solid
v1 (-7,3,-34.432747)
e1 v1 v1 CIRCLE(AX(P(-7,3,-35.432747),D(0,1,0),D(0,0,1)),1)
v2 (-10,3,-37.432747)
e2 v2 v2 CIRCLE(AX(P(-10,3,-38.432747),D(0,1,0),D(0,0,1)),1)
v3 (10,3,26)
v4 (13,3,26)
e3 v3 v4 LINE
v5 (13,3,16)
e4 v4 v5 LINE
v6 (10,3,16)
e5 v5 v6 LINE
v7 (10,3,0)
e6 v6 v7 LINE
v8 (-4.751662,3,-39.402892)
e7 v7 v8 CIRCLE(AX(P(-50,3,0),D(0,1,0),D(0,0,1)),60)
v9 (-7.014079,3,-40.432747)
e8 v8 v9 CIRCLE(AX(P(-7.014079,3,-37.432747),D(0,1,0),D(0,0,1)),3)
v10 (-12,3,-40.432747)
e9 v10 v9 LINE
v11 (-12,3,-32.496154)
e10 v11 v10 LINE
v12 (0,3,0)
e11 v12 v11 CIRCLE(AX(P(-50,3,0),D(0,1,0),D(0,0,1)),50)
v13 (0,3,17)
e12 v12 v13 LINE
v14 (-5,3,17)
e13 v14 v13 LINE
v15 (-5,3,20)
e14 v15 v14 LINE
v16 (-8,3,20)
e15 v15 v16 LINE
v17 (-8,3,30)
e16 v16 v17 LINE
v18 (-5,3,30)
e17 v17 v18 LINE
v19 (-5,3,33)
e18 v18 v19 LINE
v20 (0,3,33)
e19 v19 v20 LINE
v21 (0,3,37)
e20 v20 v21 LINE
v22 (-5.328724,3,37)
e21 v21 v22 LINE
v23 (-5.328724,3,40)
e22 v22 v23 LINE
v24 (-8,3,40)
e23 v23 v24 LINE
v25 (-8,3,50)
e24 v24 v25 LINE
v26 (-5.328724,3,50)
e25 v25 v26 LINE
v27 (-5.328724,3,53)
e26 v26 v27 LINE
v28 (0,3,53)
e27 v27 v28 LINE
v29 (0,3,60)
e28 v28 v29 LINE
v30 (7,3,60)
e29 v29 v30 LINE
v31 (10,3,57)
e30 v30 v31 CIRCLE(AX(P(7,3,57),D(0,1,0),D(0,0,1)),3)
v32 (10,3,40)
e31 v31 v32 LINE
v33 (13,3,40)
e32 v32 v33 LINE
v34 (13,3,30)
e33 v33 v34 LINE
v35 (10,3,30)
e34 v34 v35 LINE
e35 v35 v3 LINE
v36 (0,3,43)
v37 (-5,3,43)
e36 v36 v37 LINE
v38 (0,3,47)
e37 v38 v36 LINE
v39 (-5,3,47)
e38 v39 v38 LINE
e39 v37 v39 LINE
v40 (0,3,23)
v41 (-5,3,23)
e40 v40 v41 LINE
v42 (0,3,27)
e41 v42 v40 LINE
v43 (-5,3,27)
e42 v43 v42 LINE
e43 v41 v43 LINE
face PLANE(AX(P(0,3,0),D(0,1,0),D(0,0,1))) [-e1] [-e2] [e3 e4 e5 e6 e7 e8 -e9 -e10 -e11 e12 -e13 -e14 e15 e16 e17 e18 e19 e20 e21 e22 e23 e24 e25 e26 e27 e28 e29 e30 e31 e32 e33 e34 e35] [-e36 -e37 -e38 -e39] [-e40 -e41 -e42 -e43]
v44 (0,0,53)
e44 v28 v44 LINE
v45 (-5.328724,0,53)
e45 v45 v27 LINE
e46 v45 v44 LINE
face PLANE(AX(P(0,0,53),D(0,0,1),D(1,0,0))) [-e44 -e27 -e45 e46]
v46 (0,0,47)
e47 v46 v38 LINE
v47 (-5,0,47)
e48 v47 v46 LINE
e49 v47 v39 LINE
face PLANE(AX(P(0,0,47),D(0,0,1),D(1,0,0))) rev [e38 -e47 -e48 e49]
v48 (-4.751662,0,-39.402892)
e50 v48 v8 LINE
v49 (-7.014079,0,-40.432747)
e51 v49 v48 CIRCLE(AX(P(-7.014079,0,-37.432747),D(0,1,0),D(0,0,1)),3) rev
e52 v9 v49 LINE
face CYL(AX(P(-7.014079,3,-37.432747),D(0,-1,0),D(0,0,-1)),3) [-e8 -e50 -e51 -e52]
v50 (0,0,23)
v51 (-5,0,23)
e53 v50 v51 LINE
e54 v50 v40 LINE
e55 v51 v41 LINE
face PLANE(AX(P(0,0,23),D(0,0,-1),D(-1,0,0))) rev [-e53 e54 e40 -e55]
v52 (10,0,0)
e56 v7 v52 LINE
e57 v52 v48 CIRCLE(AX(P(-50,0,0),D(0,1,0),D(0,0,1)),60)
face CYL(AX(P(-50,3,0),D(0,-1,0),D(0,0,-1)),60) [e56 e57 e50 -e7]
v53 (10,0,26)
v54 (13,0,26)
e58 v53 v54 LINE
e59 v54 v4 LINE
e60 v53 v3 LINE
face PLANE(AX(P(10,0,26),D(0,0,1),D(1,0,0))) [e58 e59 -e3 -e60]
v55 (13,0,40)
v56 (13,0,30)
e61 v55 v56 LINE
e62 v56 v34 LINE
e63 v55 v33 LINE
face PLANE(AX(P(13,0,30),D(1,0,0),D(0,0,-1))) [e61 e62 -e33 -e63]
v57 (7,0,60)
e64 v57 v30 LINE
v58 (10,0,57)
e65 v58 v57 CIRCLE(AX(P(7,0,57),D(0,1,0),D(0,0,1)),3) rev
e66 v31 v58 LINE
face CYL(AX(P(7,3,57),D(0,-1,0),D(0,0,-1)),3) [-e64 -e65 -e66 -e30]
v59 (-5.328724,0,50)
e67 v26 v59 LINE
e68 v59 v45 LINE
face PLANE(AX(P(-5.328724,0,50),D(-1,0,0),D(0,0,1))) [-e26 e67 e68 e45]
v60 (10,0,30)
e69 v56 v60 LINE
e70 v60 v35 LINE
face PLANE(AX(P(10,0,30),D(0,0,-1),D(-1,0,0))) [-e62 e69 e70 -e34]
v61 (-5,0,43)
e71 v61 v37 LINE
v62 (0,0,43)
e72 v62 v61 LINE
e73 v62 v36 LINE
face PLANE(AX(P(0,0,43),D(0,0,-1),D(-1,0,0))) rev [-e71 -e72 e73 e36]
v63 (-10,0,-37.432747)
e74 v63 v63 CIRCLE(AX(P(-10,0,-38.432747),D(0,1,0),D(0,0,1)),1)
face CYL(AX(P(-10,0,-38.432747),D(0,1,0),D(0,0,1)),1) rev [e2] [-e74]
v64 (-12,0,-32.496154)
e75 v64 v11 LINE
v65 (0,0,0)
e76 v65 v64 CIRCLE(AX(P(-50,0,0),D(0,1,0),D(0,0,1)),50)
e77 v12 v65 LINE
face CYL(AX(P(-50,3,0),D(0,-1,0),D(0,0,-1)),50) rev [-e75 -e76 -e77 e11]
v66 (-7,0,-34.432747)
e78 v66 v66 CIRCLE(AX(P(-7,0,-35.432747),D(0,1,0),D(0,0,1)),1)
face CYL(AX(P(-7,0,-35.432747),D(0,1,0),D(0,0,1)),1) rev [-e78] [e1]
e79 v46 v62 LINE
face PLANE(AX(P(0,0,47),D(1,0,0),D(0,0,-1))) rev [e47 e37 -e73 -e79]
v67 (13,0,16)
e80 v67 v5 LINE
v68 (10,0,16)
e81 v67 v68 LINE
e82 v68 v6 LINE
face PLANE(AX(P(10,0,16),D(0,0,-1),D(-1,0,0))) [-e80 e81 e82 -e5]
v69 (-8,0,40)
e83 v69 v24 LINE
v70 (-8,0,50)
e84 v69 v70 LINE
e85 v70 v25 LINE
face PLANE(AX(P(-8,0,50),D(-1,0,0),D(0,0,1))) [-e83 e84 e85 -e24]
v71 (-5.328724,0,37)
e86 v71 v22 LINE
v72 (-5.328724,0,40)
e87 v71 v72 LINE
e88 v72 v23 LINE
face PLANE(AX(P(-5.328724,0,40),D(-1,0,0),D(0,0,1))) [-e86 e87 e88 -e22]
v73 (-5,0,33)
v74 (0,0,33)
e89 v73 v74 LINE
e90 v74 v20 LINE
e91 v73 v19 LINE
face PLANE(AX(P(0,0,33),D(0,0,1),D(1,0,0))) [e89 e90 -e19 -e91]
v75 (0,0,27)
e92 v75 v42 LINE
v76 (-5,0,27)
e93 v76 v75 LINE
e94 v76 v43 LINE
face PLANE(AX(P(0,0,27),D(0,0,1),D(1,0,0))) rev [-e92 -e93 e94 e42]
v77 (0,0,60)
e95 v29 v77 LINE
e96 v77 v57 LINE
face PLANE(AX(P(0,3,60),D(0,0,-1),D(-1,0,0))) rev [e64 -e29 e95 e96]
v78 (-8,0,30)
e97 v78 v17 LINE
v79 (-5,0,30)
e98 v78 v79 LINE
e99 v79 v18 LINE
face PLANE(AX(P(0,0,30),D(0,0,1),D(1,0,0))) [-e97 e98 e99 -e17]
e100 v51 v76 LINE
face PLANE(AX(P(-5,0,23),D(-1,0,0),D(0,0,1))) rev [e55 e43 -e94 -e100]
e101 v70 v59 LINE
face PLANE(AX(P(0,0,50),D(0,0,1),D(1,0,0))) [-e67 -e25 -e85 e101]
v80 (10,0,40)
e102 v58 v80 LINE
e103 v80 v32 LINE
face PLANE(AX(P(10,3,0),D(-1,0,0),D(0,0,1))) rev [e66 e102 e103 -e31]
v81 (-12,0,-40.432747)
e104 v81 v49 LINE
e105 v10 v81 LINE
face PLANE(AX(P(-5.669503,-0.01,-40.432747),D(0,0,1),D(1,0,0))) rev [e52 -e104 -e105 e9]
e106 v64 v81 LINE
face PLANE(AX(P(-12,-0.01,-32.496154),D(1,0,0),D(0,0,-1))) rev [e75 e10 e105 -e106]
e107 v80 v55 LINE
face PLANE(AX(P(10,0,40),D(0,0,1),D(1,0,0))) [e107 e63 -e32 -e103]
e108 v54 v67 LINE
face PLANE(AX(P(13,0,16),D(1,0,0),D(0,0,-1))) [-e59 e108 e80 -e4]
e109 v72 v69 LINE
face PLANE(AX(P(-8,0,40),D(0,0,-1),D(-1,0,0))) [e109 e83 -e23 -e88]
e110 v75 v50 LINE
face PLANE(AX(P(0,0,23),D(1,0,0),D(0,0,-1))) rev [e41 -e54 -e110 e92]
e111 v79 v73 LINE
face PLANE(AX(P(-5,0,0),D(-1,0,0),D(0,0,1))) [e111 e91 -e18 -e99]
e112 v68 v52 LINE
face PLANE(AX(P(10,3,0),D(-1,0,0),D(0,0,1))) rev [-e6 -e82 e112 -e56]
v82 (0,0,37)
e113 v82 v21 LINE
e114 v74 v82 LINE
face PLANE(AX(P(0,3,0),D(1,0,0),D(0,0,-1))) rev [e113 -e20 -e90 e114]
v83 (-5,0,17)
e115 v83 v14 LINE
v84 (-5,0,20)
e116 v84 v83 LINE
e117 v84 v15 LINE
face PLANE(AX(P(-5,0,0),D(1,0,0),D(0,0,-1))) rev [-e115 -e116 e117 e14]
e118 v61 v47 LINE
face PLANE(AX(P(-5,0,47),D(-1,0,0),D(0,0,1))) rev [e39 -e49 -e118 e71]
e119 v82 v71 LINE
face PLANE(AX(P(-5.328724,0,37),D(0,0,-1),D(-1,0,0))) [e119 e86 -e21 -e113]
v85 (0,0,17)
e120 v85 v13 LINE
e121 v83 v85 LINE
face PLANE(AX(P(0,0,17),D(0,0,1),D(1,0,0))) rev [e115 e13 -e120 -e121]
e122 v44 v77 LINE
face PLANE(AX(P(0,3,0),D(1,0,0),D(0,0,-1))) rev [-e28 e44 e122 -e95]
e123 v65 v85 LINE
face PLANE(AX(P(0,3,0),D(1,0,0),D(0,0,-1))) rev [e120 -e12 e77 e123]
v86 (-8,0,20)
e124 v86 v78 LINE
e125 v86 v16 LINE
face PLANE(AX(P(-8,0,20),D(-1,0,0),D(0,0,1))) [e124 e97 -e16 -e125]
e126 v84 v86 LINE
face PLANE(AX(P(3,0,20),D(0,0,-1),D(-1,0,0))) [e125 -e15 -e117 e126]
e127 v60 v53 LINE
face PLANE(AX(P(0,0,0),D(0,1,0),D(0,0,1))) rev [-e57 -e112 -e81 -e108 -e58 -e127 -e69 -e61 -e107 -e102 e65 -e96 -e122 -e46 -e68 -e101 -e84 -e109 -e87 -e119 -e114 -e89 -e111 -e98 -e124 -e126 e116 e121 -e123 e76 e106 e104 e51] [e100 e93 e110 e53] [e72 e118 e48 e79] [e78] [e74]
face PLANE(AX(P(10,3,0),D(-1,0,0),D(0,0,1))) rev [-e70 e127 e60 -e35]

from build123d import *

# Parameters (mm, degrees)
SKETCH1_R              = 50
BOSS_EXTRUDE1_DEPTH    = 3
SPLIT1_SURFACE_1_BACK  = 170.732
SPLIT1_SURFACE_1_DEPTH = 341.464
SPLIT1_SURFACE_2_BACK  = 170.732
SPLIT1_SURFACE_2_DEPTH = 341.464
BODY_DELETE1_DEPTH     = 3
FILLET1_R              = 3
BOSS_EXTRUDE4_DEPTH    = 3
SPLIT2_SURFACE_3_BACK  = 109.724
SPLIT2_SURFACE_3_DEPTH = 219.448
SPLIT2_SURFACE_4_BACK  = 109.724
SPLIT2_SURFACE_4_DEPTH = 219.448
FILLET2_R              = 3
SKETCH5_R              = 1
CUT_EXTRUDE1_DEPTH     = 3
SKETCH6_W              = 3
SKETCH6_H              = 10
BOSS_EXTRUDE5_DEPTH    = 3
BOSS_EXTRUDE6_DEPTH    = 3
SKETCH8_W              = 5
SKETCH8_H              = 3
BOSS_EXTRUDE7_DEPTH    = 3
SKETCH9_W              = 5
SKETCH9_H              = 4
CUT_EXTRUDE2_DEPTH     = 3


# Read off the part's stored shape, not the designer's step: Body-Delete1
with BuildPart() as part:
    # Sketch1 → Boss-Extrude1 (new body)
    with BuildSketch(Plane(origin=(0, 0, 0), x_dir=(1, 0, 0), z_dir=(0, 1, 0))):
        with BuildLine():
            ThreePointArc((10, 0), (-107.445626465, 17.320508076), (0, -33.166247904))
            Line((0, -33.166247904), (0, -60))
            Line((0, -60), (10, -60))
            Line((10, -60), (10, 0))
        make_face()
        with Locations(Location((-50, 0, 0), (0, 0, 270))):
            Circle(SKETCH1_R, mode=Mode.SUBTRACT)
    extrude(amount=BOSS_EXTRUDE1_DEPTH)


with BuildPart() as body_2:
    # Split1: the piece behind the surface
    add(part.part)
    # Split1 surface: a surface, the sketch's curves swept straight by 341.464 mm
    with BuildLine(Plane(origin=(0, 3, 0), x_dir=(1, 0, 0), z_dir=(0, 1, 0)).offset(-SPLIT1_SURFACE_1_BACK), mode=Mode.PRIVATE) as split1_surface_1_path:
        Line((0, -33.166247904), (0, 0))
        Line((0, 0), (-12, 0))
        Line((-12, 0), (-12, 32.496153619))
        Line((-12, 32.496153619), (-12, 67.159700612))
        Line((-12, 67.159700612), (-127.638562935, 67.159700612))
        Line((-127.638562935, 67.159700612), (-127.638562935, -72.196904976))
        Line((-127.638562935, -72.196904976), (0, -72.196904976))
        Line((0, -72.196904976), (0, -33.166247904))
    split1_surface_1 = Shell.extrude(split1_surface_1_path.wire(), (0 * SPLIT1_SURFACE_1_DEPTH, 1 * SPLIT1_SURFACE_1_DEPTH, 0 * SPLIT1_SURFACE_1_DEPTH))
    split(bisect_by=split1_surface_1, keep=Keep.BOTTOM)

    # Fillet1
    fillet1_edges = [body_2.edges().sort_by_distance(p)[0] for p in [
        (10, 1.5, 60),
    ]]
    fillet(fillet1_edges, radius=FILLET1_R)

    # Sketch3 → Boss-Extrude4 (add)
    with BuildSketch(Plane(origin=(0, 3, 0), x_dir=(1, 0, 0), z_dir=(0, 1, 0))):
        Polygon((0, -50), (-8, -50), (-8, -40), (0, -40), (3, -40), (3, -50), align=None)
        Polygon((-8, -20), (-8, -30), (0, -30), (3, -30), (3, -20), (0, -20), align=None)
    extrude(amount=-BOSS_EXTRUDE4_DEPTH)


with BuildPart() as part_1:
    add(part.part)

    # Split1: split by a surface, the side it looks to stays
    # Split1 surface: a surface, the sketch's curves swept straight by 341.464 mm
    with BuildLine(Plane(origin=(0, 3, 0), x_dir=(1, 0, 0), z_dir=(0, 1, 0)).offset(-SPLIT1_SURFACE_2_BACK), mode=Mode.PRIVATE) as split1_surface_2_path:
        Line((0, -33.166247904), (0, 0))
        Line((0, 0), (-12, 0))
        Line((-12, 0), (-12, 32.496153619))
        Line((-12, 32.496153619), (-12, 67.159700612))
        Line((-12, 67.159700612), (-127.638562935, 67.159700612))
        Line((-127.638562935, 67.159700612), (-127.638562935, -72.196904976))
        Line((-127.638562935, -72.196904976), (0, -72.196904976))
        Line((0, -72.196904976), (0, -33.166247904))
    split1_surface_2 = Shell.extrude(split1_surface_2_path.wire(), (0 * SPLIT1_SURFACE_2_DEPTH, 1 * SPLIT1_SURFACE_2_DEPTH, 0 * SPLIT1_SURFACE_2_DEPTH))
    split(bisect_by=split1_surface_2, keep=Keep.TOP)

    # Body-Delete1 outline → Body-Delete1 (cut)
    with BuildSketch(Plane(origin=(0, 0, 0), x_dir=(1, 0, 0), z_dir=(0, 1, 0))):
        with BuildLine():
            ThreePointArc((-12, 46.432747065), (-109.329587897, -8.94427191), (0, -33.166247904))
            Line((0, -33.166247904), (0, 0))
            ThreePointArc((0, 0), (-96.904157598, -17.320508075), (-12, 32.496153619))
            Line((-12, 32.496153619), (-12, 46.432747065))
        make_face()
    extrude(amount=BODY_DELETE1_DEPTH, mode=Mode.SUBTRACT)


with BuildPart() as body_2_2:
    # Split2: the piece behind the surface
    add(body_2.part)
    # Split2 surface: a surface, the sketch's curves swept straight by 219.448 mm
    with BuildLine(Plane(origin=(0, 3, 0), x_dir=(1, 0, 0), z_dir=(0, 1, 0)).offset(-SPLIT2_SURFACE_3_BACK), mode=Mode.PRIVATE) as split2_surface_3_path:
        Line((-12, 40.432747065), (-5.669502994, 40.432747065))
        Line((-5.669502994, 40.432747065), (-5.042290504, 40.432747065))
        Line((-5.042290504, 40.432747065), (-5.042290504, 47.453598883))
        Line((-5.042290504, 47.453598883), (-14.646815791, 47.453598883))
        Line((-14.646815791, 47.453598883), (-14.646815791, 40.432747065))
        Line((-14.646815791, 40.432747065), (-12, 40.432747065))
    split2_surface_3 = Shell.extrude(split2_surface_3_path.wire(), (0 * SPLIT2_SURFACE_3_DEPTH, 1 * SPLIT2_SURFACE_3_DEPTH, 0 * SPLIT2_SURFACE_3_DEPTH))
    split(bisect_by=split2_surface_3, keep=Keep.BOTTOM)

    # Fillet2
    fillet2_edges = [body_2_2.edges().sort_by_distance(p)[0] for p in [
        (-5.669502994, 1.5, -40.432747065),
    ]]
    fillet(fillet2_edges, radius=FILLET2_R)

    # Sketch5 → Cut-Extrude1 (cut)
    with BuildSketch(Plane(origin=(0, 3, 0), x_dir=(1, 0, 0), z_dir=(0, 1, 0))):
        with Locations(Location((-10, 38.432747065, 0), (0, 0, 270))):
            Circle(SKETCH5_R)
        with Locations(Location((-7, 35.432747065, 0), (0, 0, 270))):
            Circle(SKETCH5_R)
    extrude(amount=-CUT_EXTRUDE1_DEPTH, mode=Mode.SUBTRACT)

    # Sketch6 → Boss-Extrude5 (add)
    with BuildSketch(Plane(origin=(0, 3, 0), x_dir=(1, 0, 0), z_dir=(0, 1, 0))):
        with Locations((11.5, -35)):
            Rectangle(SKETCH6_W, SKETCH6_H)
        with Locations((11.5, -21)):
            Rectangle(SKETCH6_W, SKETCH6_H)
    extrude(amount=-BOSS_EXTRUDE5_DEPTH)

    # Sketch7 → Boss-Extrude6 (add)
    with BuildSketch(Plane(origin=(0, 3, 0), x_dir=(1, 0, 0), z_dir=(0, 1, 0))):
        Polygon((-5.328723834, -40), (-5.328723834, -37), (0, -37), (1.654581998, -37), (1.654581998, -41.537905148), (-0.328723834, -41.537905148), (-5.328723834, -41.537905148), align=None)
        Polygon((-5.328723834, -50), (-5.328723834, -53), (0, -53), (1.654581998, -53), (1.654581998, -47.713051581), (-5.328723834, -47.713051581), align=None)
    extrude(amount=-BOSS_EXTRUDE6_DEPTH)

    # Sketch8 → Boss-Extrude7 (add)
    with BuildSketch(Plane(origin=(0, 3, 0), x_dir=(1, 0, 0), z_dir=(0, 1, 0))):
        with Locations((-2.5, -18.5)):
            Rectangle(SKETCH8_W, SKETCH8_H)
        with Locations((-2.5, -31.5)):
            Rectangle(SKETCH8_W, SKETCH8_H)
    extrude(amount=-BOSS_EXTRUDE7_DEPTH)

    # Sketch9 → Cut-Extrude2 (cut)
    with BuildSketch(Plane(origin=(0, 3, 0), x_dir=(1, 0, 0), z_dir=(0, 1, 0))):
        with Locations((-2.5, -25)):
            Rectangle(SKETCH9_W, SKETCH9_H)
        with Locations((-2.5, -45)):
            Rectangle(SKETCH9_W, SKETCH9_H)
    extrude(amount=-CUT_EXTRUDE2_DEPTH, mode=Mode.SUBTRACT)


with BuildPart() as body_2_1:
    add(body_2.part)

    # Split2: split by a surface, the side it looks to stays
    # Split2 surface: a surface, the sketch's curves swept straight by 219.448 mm
    with BuildLine(Plane(origin=(0, 3, 0), x_dir=(1, 0, 0), z_dir=(0, 1, 0)).offset(-SPLIT2_SURFACE_4_BACK), mode=Mode.PRIVATE) as split2_surface_4_path:
        Line((-12, 40.432747065), (-5.669502994, 40.432747065))
        Line((-5.669502994, 40.432747065), (-5.042290504, 40.432747065))
        Line((-5.042290504, 40.432747065), (-5.042290504, 47.453598883))
        Line((-5.042290504, 47.453598883), (-14.646815791, 47.453598883))
        Line((-14.646815791, 47.453598883), (-14.646815791, 40.432747065))
        Line((-14.646815791, 40.432747065), (-12, 40.432747065))
    split2_surface_4 = Shell.extrude(split2_surface_4_path.wire(), (0 * SPLIT2_SURFACE_4_DEPTH, 1 * SPLIT2_SURFACE_4_DEPTH, 0 * SPLIT2_SURFACE_4_DEPTH))
    split(bisect_by=split2_surface_4, keep=Keep.TOP)


solid = body_2_2.part
